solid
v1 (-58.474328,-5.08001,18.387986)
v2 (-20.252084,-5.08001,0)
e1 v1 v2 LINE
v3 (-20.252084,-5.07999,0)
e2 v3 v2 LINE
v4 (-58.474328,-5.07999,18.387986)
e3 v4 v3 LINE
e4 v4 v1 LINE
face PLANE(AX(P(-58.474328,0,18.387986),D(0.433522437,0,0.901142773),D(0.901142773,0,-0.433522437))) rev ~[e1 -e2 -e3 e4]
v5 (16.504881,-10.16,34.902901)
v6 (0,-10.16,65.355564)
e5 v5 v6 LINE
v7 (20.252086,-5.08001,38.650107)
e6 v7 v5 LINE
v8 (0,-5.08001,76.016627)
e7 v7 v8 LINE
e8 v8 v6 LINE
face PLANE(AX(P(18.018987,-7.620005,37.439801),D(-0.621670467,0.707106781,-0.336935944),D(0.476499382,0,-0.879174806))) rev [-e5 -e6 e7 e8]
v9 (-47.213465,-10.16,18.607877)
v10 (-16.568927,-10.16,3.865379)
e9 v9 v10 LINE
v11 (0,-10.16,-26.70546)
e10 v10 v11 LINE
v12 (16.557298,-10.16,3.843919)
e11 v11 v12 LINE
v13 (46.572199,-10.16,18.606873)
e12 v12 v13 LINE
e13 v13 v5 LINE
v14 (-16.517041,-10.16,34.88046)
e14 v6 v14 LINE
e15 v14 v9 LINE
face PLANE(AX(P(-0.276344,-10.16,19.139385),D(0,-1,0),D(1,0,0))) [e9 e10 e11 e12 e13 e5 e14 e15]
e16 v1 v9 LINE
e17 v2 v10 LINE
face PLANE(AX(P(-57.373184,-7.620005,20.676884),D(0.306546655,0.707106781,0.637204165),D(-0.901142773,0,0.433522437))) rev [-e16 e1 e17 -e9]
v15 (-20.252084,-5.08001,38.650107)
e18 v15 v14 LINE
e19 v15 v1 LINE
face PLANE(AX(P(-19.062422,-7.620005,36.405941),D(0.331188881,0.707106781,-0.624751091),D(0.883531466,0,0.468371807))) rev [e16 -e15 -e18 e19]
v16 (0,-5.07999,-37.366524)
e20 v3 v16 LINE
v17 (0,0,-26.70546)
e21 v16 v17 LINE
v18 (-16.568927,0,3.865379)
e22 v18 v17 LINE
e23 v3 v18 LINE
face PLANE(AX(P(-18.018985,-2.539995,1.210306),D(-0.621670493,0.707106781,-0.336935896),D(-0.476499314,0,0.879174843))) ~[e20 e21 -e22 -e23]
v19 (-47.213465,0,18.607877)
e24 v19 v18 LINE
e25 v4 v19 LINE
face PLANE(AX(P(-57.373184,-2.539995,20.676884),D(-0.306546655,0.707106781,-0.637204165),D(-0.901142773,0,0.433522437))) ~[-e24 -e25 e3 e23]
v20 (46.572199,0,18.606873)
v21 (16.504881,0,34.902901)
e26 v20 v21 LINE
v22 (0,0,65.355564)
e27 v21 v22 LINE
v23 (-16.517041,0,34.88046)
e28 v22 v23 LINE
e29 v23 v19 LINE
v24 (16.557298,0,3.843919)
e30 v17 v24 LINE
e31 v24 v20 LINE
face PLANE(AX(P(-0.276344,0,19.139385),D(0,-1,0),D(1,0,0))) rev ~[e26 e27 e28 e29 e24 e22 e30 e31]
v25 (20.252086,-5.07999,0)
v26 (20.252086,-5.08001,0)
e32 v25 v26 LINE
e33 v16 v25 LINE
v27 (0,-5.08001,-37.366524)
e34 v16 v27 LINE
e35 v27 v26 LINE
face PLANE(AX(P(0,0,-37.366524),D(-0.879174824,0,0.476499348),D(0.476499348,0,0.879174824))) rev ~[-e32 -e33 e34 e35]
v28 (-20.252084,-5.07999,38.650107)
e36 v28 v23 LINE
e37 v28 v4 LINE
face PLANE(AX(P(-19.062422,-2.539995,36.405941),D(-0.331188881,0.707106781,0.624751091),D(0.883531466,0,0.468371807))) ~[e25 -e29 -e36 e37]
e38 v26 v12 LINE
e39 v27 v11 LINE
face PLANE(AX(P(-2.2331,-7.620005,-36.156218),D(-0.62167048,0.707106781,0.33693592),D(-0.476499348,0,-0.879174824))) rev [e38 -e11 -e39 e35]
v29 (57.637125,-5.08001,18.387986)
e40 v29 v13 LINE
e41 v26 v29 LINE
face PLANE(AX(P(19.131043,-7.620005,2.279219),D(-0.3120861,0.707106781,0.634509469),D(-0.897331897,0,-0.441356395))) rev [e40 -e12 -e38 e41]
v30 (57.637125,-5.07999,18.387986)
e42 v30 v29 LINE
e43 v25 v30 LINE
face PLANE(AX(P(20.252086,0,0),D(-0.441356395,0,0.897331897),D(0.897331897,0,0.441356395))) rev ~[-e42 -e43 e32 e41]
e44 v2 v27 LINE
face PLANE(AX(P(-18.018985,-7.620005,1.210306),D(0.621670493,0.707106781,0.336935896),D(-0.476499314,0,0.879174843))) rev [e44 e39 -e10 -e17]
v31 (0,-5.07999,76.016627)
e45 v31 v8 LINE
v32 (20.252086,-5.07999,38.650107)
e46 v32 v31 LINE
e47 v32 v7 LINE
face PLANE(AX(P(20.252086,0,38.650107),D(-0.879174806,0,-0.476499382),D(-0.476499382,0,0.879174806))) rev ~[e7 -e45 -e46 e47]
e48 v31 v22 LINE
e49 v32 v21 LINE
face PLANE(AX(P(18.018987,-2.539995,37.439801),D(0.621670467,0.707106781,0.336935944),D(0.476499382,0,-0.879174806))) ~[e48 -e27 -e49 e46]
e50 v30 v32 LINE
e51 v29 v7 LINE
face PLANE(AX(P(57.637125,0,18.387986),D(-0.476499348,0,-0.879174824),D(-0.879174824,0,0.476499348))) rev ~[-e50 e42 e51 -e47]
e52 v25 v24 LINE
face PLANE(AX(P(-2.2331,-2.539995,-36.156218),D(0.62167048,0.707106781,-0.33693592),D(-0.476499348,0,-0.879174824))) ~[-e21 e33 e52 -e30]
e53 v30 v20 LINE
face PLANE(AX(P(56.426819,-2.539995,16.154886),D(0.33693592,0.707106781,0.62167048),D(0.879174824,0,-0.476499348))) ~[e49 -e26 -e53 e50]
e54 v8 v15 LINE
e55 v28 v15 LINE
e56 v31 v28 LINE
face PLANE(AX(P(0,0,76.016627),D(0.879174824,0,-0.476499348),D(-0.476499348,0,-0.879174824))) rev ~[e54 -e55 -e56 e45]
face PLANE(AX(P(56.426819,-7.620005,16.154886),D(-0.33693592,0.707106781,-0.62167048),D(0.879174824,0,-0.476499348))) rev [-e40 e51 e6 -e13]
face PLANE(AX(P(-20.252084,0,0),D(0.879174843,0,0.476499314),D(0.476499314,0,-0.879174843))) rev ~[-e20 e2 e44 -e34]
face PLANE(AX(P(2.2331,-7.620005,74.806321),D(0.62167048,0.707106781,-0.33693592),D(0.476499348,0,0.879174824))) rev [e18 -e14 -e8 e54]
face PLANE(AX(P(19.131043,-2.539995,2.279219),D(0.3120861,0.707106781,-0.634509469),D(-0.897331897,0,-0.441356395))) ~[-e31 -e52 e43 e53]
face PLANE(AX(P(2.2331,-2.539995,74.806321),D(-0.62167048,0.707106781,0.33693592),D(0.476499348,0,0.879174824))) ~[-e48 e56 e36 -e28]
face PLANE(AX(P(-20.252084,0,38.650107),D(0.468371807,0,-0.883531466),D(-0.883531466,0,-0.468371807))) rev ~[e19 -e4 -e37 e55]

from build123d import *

# Parameters (mm, degrees)
F1_DEPTH = 10.16
F2_SIZE  = 5.07999


# Not quite as in the source:
# - a fillet or chamfer is up to 0.001 mm smaller than in the source, because OpenCascade refuses the exact size


with BuildPart() as f1:
    # F0 (on Front) → F1 (new body)
    with BuildSketch(Plane.XZ):
        Polygon((20.2520862222, 38.6501066387), (0, 76.0166272521), (-20.2520843595, 38.6501066387), (-58.4743283689, 18.3879856241), (-20.2520843595, 0), (0, -37.3665240501), (20.2520862222, 0), (57.6371251704, 18.3879856241), align=None)
    extrude(amount=F1_DEPTH)

    # F2 (size 5.08 in the source; OpenCascade refuses exactly that, so slightly less here)
    f2_edges = [f1.edges().sort_by_distance(p)[0] for p in [
        (-39.363206, -10.16, 28.519046),
        (-10.126042, -10.16, 57.333367),
        (10.126043, -10.16, 57.333367),
        (38.944606, -10.16, 28.519046),
        (38.944606, -10.16, 9.193993),
        (10.126043, -10.16, -18.683262),
        (-10.126042, -10.16, -18.683262),
        (-39.363206, -10.16, 9.193993),
        (10.126043, 0, 57.333367),
        (-10.126042, 0, 57.333367),
        (-39.363206, 0, 28.519046),
        (-39.363206, 0, 9.193993),
        (-10.126042, 0, -18.683262),
        (10.126043, 0, -18.683262),
        (38.944606, 0, 9.193993),
        (38.944606, 0, 28.519046),
    ]]
    chamfer(f2_edges, length=F2_SIZE)


solid = f1.part
